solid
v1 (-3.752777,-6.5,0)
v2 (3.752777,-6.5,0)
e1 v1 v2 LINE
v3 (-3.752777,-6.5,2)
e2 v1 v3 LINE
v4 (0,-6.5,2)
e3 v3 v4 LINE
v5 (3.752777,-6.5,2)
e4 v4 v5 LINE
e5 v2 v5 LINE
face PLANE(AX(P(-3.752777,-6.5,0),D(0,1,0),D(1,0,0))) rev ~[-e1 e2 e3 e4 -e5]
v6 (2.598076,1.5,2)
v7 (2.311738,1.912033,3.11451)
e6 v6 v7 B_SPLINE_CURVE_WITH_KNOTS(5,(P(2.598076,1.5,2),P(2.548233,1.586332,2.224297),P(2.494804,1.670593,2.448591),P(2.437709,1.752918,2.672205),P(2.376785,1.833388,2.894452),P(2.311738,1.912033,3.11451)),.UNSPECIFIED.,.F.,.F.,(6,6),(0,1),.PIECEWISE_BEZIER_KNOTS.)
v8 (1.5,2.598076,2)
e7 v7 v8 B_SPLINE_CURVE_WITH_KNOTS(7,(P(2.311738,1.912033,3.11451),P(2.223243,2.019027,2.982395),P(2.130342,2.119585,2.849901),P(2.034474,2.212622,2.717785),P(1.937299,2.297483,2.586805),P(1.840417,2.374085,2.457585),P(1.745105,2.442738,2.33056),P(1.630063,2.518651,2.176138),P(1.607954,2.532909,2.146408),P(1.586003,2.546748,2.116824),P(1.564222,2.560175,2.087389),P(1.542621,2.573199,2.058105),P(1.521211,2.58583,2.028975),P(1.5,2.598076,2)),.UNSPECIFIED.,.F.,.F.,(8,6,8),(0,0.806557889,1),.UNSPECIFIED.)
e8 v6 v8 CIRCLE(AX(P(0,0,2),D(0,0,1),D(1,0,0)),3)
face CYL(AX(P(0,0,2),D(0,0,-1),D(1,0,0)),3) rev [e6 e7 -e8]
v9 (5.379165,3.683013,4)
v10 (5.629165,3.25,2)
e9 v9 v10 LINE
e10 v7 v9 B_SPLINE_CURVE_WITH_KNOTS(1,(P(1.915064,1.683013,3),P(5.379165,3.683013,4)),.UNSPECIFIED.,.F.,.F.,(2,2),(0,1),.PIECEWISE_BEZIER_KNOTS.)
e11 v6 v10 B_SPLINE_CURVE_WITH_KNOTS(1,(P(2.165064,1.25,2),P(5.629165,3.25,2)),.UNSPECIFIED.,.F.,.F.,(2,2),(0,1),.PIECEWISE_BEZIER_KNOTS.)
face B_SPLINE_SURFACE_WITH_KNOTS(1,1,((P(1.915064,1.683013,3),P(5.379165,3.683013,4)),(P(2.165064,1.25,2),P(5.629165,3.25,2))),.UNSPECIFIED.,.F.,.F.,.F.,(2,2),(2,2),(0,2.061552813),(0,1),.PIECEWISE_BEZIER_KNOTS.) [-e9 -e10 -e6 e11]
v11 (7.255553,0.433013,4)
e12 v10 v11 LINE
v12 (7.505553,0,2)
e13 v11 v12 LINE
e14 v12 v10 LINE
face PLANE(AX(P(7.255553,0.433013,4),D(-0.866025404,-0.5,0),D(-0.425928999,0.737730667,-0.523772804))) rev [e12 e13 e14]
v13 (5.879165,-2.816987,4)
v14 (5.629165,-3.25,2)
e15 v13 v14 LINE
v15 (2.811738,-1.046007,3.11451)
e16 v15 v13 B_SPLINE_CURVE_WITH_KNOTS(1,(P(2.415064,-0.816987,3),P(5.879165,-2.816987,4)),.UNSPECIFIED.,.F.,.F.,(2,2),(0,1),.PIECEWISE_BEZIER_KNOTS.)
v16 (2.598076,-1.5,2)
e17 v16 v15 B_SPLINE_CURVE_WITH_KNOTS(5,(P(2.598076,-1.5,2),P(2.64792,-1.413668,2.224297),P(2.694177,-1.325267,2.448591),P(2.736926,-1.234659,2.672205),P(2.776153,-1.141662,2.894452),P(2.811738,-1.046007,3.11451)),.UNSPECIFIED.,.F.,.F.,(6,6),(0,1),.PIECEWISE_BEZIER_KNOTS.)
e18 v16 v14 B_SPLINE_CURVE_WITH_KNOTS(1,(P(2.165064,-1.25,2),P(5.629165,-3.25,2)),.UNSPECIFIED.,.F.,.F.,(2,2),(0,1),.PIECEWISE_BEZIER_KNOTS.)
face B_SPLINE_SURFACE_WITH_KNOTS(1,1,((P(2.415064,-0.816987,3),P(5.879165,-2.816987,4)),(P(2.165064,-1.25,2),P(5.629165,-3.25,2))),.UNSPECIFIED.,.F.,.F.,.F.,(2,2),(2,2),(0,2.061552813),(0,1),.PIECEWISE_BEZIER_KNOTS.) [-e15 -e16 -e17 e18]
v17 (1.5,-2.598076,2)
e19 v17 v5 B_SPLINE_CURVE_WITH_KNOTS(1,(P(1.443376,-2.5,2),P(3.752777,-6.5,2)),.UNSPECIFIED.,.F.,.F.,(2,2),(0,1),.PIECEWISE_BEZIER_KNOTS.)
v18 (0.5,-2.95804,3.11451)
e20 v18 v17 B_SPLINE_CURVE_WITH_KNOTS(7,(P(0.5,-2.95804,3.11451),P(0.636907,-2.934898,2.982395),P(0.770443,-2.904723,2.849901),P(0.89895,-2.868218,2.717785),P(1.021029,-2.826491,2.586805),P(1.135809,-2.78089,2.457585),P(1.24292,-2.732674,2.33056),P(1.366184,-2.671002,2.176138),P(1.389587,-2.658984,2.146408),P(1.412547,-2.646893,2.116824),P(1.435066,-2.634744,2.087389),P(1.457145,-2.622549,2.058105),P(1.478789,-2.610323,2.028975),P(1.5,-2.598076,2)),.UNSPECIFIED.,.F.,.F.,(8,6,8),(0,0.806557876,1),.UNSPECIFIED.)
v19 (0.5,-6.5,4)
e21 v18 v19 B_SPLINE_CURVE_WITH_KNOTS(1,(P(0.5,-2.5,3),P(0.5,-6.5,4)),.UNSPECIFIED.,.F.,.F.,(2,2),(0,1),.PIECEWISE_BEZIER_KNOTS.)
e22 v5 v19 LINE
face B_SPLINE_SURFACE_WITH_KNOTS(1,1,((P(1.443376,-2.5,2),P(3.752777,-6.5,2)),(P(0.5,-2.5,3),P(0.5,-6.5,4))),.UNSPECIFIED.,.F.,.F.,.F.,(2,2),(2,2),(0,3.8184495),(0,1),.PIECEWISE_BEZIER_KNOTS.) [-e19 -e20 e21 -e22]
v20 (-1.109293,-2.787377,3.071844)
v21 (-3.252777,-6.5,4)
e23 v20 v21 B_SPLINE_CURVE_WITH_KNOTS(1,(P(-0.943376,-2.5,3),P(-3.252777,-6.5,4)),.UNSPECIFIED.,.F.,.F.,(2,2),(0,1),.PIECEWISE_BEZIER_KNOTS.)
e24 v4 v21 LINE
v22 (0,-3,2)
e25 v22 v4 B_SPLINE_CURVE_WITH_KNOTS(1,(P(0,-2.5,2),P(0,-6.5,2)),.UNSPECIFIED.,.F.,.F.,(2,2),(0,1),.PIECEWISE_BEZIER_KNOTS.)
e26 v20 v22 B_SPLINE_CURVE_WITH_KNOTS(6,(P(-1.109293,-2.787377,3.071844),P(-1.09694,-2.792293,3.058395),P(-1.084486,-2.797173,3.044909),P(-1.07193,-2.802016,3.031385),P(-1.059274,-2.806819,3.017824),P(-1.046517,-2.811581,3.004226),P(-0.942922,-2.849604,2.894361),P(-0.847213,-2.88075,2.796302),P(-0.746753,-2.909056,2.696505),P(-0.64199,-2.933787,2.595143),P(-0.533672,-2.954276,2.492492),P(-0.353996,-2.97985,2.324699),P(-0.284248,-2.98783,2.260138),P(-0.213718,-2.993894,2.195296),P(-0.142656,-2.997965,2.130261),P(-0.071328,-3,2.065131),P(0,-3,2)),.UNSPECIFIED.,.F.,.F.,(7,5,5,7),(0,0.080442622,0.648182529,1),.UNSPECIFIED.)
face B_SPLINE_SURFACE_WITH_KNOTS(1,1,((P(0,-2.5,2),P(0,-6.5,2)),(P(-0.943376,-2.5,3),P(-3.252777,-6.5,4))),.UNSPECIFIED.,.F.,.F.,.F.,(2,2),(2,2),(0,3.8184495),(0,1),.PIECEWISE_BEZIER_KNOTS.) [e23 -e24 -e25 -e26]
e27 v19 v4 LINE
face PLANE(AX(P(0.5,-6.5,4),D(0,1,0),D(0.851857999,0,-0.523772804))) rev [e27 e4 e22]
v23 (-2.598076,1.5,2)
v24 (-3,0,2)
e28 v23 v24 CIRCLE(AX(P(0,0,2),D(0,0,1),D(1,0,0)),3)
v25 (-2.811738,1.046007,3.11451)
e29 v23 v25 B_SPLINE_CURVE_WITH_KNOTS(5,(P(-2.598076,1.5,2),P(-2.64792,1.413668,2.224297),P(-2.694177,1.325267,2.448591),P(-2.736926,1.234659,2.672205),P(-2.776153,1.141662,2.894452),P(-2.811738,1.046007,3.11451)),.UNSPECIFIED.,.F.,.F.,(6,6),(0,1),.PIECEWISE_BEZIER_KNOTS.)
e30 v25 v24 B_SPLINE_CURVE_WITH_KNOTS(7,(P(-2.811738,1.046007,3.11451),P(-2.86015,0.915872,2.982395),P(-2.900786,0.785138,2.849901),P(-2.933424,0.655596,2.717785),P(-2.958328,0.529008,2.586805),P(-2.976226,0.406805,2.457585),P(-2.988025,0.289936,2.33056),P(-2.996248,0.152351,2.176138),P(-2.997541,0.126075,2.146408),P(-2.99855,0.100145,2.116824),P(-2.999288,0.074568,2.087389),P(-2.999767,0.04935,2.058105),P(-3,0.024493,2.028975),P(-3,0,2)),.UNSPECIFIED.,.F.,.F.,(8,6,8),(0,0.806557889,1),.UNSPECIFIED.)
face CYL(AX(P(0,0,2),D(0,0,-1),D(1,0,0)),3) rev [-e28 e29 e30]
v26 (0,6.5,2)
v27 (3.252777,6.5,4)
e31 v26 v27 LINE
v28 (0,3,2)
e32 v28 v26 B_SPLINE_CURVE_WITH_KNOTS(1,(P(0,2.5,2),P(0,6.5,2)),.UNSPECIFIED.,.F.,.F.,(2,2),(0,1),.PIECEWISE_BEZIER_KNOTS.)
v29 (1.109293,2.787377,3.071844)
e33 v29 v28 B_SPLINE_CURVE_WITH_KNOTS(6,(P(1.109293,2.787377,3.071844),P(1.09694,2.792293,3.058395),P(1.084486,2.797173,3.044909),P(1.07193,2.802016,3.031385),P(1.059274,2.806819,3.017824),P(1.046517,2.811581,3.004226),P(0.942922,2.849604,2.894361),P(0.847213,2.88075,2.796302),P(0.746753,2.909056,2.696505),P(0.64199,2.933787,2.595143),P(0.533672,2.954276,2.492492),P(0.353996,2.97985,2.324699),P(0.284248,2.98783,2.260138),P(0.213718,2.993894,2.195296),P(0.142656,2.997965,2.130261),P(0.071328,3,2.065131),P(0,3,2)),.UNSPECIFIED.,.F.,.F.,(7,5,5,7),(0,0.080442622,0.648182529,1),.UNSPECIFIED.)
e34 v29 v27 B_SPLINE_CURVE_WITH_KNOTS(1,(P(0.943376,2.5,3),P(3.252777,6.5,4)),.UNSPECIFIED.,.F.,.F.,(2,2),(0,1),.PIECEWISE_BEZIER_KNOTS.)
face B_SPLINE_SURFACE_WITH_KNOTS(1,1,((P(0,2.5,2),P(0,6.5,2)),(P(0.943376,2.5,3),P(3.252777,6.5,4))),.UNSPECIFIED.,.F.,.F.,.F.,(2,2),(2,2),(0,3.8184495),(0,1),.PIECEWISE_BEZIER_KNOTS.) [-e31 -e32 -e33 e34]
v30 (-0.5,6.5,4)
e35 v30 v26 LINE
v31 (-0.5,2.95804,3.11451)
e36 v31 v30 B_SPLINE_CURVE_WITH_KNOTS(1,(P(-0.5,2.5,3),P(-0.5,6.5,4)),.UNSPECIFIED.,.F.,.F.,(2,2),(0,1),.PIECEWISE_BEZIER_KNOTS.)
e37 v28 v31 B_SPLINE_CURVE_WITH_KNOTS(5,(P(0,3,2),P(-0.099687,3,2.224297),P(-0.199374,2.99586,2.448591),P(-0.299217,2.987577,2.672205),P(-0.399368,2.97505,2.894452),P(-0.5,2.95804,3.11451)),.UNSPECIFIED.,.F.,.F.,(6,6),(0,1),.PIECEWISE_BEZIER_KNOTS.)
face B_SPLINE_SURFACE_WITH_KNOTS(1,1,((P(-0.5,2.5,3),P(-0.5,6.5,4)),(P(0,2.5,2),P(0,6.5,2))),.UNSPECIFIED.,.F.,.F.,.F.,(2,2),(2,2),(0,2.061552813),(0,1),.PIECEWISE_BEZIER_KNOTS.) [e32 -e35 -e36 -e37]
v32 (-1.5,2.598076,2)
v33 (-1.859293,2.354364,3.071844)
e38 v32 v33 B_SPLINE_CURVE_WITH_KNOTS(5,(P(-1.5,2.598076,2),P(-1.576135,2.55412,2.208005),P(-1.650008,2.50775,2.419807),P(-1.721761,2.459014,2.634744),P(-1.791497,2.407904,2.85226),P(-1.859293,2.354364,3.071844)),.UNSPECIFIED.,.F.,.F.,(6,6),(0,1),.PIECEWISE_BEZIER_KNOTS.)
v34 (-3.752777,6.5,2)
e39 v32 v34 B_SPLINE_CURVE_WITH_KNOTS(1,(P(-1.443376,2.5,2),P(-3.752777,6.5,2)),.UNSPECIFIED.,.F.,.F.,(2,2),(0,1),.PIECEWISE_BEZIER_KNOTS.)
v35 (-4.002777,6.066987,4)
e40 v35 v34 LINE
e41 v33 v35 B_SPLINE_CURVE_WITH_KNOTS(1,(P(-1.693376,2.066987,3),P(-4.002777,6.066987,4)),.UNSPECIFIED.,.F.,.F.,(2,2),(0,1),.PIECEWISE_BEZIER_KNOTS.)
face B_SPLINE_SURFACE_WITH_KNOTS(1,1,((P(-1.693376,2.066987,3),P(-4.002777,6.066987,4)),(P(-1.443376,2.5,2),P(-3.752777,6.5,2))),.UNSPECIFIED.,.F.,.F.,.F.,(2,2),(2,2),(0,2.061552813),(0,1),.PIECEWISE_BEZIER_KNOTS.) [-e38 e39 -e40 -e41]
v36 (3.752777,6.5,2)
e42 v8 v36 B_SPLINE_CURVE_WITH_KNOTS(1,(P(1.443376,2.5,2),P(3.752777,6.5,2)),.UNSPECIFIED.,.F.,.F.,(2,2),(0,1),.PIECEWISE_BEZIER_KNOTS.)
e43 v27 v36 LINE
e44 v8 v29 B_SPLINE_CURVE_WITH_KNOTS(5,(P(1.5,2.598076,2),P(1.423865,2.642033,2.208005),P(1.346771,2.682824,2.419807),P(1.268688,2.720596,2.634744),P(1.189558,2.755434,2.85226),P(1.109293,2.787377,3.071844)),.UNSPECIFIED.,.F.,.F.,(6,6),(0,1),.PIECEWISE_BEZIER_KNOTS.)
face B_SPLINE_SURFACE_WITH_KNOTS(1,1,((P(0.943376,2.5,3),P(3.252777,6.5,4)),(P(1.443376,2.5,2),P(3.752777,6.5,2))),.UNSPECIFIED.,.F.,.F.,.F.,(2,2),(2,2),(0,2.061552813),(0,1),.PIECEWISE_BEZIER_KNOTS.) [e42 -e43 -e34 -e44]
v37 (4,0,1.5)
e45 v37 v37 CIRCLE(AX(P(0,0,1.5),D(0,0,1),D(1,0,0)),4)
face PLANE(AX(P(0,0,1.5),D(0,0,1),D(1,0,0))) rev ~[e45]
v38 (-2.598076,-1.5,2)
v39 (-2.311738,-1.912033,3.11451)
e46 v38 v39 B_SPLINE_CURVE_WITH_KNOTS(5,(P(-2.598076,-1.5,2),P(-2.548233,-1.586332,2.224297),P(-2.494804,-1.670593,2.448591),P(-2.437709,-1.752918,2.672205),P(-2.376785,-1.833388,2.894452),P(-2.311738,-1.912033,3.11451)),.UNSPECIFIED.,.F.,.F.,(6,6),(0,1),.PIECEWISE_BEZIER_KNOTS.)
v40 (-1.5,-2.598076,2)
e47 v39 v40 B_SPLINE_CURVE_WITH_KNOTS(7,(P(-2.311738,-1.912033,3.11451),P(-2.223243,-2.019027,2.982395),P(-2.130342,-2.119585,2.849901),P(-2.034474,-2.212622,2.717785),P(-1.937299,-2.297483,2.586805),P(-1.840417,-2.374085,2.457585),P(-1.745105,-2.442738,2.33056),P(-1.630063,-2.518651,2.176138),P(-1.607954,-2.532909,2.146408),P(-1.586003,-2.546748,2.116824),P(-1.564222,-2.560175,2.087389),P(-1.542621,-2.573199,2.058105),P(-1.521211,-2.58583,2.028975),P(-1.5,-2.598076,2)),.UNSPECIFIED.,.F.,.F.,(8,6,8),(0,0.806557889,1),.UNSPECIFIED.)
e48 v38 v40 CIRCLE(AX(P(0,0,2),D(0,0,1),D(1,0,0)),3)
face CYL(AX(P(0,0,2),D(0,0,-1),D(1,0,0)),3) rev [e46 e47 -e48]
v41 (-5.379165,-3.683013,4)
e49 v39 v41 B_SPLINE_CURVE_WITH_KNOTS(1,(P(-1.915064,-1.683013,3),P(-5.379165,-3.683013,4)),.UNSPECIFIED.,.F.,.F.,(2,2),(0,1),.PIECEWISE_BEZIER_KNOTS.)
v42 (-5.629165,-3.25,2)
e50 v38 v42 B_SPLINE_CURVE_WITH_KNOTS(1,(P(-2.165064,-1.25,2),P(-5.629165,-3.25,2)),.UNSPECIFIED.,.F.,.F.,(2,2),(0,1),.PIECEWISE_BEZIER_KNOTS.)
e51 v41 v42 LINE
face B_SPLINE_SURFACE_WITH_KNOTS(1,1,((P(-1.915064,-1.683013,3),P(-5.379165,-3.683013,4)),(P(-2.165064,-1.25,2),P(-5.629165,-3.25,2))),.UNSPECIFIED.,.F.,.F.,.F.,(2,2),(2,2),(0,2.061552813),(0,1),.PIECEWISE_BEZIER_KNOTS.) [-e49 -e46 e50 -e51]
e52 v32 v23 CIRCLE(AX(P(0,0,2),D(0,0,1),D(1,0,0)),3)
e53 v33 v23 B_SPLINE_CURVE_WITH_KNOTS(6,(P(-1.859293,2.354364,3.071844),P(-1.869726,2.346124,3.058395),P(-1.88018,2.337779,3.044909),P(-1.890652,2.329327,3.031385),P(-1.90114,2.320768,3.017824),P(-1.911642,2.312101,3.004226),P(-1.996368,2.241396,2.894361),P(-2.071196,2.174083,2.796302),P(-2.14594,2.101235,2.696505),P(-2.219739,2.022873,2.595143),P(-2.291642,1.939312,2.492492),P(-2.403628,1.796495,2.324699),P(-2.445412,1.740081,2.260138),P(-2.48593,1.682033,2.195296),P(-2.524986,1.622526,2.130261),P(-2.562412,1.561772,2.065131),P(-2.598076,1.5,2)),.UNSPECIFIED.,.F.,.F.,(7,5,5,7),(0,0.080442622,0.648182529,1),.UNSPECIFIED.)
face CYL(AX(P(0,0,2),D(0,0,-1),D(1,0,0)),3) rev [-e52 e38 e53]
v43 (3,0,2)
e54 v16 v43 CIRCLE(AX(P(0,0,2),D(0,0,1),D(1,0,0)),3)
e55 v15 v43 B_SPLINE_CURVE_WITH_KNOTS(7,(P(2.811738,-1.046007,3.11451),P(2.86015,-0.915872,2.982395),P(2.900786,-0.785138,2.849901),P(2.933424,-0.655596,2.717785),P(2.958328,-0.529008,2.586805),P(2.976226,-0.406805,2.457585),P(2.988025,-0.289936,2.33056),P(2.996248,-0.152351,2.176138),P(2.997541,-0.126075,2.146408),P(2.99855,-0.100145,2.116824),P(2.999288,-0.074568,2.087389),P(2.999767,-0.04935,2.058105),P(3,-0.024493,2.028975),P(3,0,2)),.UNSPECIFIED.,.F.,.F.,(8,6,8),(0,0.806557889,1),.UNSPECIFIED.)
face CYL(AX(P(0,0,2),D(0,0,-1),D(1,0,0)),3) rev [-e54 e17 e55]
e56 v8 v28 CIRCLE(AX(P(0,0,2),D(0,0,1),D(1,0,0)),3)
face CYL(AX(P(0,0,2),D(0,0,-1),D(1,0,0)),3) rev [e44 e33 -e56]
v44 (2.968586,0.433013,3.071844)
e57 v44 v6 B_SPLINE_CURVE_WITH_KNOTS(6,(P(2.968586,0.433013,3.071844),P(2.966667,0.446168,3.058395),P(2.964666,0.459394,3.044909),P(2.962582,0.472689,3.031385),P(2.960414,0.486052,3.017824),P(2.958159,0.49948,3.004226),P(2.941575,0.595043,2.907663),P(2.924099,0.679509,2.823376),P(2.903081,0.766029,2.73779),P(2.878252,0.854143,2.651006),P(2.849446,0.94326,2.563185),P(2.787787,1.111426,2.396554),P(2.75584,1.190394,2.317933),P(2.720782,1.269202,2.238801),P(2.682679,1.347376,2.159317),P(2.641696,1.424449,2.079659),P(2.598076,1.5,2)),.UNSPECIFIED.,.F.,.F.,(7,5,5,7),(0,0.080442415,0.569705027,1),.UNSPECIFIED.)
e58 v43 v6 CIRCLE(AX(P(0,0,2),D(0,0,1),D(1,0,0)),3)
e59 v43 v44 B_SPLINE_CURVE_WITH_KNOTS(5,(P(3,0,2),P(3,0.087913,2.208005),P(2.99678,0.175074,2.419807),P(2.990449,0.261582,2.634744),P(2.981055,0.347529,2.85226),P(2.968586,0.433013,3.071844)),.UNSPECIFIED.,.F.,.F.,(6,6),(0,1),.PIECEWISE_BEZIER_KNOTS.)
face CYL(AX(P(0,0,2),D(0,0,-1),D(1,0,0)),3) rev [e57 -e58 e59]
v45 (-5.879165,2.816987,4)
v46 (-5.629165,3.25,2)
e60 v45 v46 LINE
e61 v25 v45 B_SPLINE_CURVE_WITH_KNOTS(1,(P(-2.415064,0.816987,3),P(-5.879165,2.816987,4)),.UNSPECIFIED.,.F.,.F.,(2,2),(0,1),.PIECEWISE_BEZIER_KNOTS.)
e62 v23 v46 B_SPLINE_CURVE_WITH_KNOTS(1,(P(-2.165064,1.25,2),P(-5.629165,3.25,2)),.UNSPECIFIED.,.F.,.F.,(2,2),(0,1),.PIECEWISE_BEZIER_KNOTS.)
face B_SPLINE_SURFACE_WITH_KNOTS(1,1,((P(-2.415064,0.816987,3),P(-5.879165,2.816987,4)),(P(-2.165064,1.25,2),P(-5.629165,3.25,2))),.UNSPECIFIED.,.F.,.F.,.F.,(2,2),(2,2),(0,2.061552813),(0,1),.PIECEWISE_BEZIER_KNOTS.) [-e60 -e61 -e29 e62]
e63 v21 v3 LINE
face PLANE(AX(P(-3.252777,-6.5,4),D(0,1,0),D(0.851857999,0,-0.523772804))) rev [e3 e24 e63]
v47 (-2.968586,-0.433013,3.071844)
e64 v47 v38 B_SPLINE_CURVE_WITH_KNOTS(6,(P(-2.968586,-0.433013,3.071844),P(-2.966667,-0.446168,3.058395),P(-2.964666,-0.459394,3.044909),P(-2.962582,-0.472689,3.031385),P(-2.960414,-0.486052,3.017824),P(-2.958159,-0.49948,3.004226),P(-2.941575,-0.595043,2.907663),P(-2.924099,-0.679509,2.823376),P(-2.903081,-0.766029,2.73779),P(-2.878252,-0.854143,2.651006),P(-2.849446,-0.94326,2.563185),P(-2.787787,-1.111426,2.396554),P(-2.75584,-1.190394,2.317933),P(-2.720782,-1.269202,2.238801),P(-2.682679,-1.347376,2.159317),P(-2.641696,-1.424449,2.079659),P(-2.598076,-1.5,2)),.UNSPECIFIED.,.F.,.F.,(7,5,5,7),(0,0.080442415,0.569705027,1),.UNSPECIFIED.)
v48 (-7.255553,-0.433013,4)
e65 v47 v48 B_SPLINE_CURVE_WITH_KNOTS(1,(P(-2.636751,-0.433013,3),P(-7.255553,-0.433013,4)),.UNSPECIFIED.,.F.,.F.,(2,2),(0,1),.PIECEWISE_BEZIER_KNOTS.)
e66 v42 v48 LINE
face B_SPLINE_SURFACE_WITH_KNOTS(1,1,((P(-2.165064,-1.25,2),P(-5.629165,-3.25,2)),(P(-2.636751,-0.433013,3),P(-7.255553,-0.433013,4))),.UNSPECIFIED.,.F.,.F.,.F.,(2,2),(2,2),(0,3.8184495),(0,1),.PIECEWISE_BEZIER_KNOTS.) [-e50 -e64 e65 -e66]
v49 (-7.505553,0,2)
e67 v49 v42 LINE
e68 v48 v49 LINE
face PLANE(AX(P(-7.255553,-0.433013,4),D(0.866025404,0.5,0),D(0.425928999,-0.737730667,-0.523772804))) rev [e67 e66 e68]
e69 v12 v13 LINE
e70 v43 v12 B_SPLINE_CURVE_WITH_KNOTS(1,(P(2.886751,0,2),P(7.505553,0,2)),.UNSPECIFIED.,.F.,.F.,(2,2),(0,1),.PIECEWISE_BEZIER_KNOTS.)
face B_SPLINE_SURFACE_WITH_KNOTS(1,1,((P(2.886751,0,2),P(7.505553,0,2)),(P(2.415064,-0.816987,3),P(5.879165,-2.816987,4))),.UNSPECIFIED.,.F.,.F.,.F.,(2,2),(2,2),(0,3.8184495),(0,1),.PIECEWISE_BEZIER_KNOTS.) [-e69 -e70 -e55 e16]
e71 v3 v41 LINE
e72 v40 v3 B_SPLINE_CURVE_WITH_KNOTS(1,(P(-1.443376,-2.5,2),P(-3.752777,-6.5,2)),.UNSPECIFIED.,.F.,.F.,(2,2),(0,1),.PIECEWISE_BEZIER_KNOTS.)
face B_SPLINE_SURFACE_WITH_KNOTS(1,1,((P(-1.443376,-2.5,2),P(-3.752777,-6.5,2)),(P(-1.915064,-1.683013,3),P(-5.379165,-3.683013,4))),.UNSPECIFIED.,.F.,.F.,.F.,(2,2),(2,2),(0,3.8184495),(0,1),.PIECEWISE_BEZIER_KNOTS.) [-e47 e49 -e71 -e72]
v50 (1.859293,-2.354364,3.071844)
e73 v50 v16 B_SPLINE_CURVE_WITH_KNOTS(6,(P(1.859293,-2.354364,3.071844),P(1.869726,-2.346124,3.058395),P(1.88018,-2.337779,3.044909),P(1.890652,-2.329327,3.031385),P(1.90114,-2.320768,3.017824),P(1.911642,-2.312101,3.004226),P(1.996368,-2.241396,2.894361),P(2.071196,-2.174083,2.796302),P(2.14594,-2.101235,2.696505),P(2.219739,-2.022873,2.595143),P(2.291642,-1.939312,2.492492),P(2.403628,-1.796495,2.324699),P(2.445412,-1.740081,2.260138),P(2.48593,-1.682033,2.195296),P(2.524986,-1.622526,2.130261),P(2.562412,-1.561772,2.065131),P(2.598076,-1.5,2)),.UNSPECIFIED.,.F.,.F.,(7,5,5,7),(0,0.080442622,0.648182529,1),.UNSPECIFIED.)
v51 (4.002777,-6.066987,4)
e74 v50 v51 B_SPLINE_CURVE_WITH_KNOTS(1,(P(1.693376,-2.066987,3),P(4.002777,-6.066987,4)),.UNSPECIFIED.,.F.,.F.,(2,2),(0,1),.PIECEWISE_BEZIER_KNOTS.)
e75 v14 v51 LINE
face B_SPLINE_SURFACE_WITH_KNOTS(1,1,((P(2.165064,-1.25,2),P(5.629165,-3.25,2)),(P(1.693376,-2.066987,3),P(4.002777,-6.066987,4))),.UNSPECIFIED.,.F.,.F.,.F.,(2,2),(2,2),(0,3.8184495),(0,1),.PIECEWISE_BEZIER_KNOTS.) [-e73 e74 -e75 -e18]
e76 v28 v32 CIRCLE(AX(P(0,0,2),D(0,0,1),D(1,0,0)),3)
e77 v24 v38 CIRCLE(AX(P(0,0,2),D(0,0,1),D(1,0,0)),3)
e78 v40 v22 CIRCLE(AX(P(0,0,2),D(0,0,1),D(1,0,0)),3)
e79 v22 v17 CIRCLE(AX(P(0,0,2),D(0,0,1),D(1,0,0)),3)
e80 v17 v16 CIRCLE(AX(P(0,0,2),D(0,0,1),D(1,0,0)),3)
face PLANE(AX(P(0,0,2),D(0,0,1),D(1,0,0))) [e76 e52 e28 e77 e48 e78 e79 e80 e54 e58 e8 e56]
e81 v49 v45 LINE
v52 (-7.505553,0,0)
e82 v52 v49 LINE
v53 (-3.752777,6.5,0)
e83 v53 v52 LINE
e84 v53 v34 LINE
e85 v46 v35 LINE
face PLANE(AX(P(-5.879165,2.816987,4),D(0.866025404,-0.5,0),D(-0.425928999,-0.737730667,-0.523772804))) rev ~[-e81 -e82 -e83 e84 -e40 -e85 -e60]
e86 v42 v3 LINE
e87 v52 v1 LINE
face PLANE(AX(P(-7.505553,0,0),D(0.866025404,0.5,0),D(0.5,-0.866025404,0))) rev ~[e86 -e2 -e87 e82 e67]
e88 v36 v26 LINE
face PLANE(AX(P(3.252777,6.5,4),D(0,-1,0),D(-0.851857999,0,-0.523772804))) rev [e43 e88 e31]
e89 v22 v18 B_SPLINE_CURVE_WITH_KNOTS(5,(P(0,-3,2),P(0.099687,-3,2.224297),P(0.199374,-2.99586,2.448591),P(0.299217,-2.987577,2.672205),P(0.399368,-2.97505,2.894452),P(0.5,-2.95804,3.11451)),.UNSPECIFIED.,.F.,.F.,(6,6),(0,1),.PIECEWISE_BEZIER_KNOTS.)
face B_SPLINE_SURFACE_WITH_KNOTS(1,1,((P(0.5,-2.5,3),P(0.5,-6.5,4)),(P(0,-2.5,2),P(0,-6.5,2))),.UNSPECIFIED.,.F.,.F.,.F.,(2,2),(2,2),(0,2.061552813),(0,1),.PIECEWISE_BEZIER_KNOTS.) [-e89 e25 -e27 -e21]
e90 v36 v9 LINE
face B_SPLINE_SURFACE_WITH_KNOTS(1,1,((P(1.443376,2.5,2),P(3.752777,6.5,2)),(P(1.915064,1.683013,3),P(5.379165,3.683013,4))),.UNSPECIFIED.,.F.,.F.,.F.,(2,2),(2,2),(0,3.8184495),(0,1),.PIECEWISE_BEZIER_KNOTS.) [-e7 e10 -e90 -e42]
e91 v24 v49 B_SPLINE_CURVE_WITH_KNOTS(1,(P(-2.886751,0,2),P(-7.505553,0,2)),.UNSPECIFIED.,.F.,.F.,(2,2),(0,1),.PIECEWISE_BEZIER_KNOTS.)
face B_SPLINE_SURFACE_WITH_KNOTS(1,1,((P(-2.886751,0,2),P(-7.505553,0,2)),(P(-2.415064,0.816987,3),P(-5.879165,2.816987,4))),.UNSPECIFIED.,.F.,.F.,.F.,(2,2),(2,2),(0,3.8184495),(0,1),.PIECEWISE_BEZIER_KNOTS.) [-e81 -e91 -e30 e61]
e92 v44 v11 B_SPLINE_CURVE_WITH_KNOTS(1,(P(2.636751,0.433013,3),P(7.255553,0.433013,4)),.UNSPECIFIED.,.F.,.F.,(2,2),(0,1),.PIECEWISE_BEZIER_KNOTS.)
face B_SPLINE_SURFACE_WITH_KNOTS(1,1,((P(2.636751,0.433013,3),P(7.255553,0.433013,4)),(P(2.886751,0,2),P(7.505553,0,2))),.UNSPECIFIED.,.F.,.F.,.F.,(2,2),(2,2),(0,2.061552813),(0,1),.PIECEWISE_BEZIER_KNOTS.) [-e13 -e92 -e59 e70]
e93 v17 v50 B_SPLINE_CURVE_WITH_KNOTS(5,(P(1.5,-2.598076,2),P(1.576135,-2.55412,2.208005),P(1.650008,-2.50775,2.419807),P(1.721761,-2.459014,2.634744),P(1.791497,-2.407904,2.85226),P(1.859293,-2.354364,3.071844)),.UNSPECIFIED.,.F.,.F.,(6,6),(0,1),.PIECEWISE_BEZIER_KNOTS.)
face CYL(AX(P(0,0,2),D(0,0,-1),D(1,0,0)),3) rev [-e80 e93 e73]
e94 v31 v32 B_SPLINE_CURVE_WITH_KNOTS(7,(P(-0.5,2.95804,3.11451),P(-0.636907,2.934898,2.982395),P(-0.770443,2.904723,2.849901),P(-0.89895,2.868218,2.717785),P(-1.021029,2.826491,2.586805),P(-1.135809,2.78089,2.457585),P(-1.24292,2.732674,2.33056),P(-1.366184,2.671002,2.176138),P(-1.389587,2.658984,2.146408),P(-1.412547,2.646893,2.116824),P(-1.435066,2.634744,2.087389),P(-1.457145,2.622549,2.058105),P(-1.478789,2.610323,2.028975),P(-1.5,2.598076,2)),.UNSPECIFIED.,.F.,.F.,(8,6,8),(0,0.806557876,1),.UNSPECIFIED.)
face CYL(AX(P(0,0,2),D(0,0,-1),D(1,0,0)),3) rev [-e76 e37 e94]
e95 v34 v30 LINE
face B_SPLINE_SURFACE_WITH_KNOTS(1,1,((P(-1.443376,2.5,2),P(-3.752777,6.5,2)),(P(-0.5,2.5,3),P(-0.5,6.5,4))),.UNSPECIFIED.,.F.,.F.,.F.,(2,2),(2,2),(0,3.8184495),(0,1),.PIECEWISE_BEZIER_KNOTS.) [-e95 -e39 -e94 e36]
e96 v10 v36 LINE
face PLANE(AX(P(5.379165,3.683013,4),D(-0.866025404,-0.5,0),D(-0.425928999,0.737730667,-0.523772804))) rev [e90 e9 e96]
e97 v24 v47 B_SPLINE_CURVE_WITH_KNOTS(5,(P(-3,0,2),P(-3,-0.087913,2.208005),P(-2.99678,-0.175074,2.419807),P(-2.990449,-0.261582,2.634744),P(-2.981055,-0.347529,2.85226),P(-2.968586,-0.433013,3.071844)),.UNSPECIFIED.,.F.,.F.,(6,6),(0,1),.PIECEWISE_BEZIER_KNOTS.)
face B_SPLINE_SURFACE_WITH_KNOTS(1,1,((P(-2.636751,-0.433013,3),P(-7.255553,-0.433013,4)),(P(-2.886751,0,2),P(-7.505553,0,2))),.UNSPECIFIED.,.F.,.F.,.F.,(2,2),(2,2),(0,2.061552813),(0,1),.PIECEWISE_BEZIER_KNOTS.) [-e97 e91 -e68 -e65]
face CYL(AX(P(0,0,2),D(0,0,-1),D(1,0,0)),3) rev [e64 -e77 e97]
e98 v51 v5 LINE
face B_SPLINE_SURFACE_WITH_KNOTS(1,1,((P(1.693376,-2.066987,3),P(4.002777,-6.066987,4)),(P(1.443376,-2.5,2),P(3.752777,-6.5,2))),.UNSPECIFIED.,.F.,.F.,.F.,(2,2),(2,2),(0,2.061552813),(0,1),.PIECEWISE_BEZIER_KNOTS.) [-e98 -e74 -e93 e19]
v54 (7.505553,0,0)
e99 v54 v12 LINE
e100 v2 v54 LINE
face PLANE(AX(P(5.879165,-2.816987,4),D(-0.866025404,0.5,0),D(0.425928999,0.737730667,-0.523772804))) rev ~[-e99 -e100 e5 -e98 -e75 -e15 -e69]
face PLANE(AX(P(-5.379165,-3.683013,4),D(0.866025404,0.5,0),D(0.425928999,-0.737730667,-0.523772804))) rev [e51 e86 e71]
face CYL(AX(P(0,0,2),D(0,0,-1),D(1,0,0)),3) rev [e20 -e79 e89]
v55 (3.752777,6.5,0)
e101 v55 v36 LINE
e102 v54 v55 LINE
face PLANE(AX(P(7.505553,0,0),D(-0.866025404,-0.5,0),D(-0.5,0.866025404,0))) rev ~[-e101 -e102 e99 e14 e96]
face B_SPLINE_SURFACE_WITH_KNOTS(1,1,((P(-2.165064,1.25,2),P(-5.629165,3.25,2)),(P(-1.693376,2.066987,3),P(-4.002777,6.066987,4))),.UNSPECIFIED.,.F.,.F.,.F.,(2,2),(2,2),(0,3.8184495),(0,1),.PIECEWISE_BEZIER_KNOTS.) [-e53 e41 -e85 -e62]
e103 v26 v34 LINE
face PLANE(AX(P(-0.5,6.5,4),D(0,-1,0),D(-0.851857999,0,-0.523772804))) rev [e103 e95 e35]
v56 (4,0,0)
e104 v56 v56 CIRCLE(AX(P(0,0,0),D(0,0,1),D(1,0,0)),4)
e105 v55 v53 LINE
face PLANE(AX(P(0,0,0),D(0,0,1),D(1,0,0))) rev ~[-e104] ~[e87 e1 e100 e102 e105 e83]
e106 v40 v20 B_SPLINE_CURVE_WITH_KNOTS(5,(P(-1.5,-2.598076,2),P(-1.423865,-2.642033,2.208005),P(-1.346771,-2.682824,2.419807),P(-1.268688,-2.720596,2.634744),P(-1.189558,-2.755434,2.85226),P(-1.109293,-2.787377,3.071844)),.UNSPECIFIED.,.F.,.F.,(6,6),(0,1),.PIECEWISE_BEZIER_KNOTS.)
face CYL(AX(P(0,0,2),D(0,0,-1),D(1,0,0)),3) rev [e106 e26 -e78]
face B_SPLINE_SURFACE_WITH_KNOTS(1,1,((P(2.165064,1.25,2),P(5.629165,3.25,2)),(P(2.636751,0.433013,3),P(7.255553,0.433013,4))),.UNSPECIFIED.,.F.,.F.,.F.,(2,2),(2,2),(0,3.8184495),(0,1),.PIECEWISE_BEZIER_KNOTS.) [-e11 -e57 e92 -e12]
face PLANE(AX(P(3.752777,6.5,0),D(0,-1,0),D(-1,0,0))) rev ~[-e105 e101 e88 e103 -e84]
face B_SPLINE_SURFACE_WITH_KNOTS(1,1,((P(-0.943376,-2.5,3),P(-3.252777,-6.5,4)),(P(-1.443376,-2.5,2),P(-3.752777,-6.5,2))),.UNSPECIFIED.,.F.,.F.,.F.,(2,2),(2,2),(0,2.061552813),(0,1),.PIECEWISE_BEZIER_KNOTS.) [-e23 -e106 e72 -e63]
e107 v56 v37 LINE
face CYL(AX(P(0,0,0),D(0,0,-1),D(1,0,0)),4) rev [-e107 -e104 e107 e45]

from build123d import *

# Parameters (mm, degrees)
F1_DEPTH        = 2
F6_COPIES_COUNT = 6
F7_COPIES_COUNT = 6
F8_R            = 4
F9_DEPTH        = 1.5
F10_R           = 3
F11_DEPTH       = 2.0010001


# Not quite as in the source:
# - a pattern or mirror of a feature is missing from the dataset's text; its kind, count and spacing are read off the source's solid


with BuildPart() as f1:
    # F0 (on Top) → F1 (new body)
    with BuildSketch(Plane.XY):
        Polygon((3.7527767497, 6.5), (-3.7527767497, 6.5), (-7.5055534995, 0), (-3.7527767497, -6.5), (3.7527767497, -6.5), (7.5055534995, 0), align=None)
    extrude(amount=F1_DEPTH)

    # F5 (on offset) → F6 section 0
    with BuildSketch(Plane(origin=(-2.1650635095, -1.25, 0), x_dir=(0.5, -0.8660254038, 0), z_dir=(-0.8660254038, -0.5, 0))):
        Polygon((-0.943375673, 3), (-1.443375673, 2), (0, 2), align=None)
    # F3 (on face) → F6 section 1
    with BuildSketch(Plane(origin=(-5.6291651246, -3.25, 0), x_dir=(0.5, -0.8660254038, 0), z_dir=(-0.8660254038, -0.5, 0))):
        Polygon((-3.2527767497, 4), (-3.7527767497, 2), (0, 2), align=None)
    f6 = loft()

    # F6_copies: F6 ×6 about axis
    f6_copies_axis = Axis((0, 0, 0), (0, 0, 1))
    for i in range(1, F6_COPIES_COUNT):
        add(f6.rotate(f6_copies_axis, i * 360 / F6_COPIES_COUNT))

    # F5 (on offset) → F7 section 0
    with BuildSketch(Plane(origin=(-2.1650635095, -1.25, 0), x_dir=(0.5, -0.8660254038, 0), z_dir=(-0.8660254038, -0.5, 0))):
        Polygon((0.5, 3), (0, 2), (1.443375673, 2), align=None)
    # F3 (on face) → F7 section 1
    with BuildSketch(Plane(origin=(-5.6291651246, -3.25, 0), x_dir=(0.5, -0.8660254038, 0), z_dir=(-0.8660254038, -0.5, 0))):
        Polygon((0.5, 4), (0, 2), (3.7527767497, 2), align=None)
    f7 = loft()

    # F7_copies: F7 ×6 about axis
    f7_copies_axis = Axis((0, 0, 0), (0, 0, 1))
    for i in range(1, F7_COPIES_COUNT):
        add(f7.rotate(f7_copies_axis, i * 360 / F7_COPIES_COUNT))

    # F8 (on Top) → F9 (cut)
    with BuildSketch(Plane.XY):
        Circle(F8_R)
    extrude(amount=F9_DEPTH, mode=Mode.SUBTRACT)

    # F10 (on face) → F11 (cut, through all)
    with BuildSketch(Plane.XY.offset(2)):
        Circle(F10_R)
    extrude(amount=F11_DEPTH, mode=Mode.SUBTRACT)


solid = f1.part
